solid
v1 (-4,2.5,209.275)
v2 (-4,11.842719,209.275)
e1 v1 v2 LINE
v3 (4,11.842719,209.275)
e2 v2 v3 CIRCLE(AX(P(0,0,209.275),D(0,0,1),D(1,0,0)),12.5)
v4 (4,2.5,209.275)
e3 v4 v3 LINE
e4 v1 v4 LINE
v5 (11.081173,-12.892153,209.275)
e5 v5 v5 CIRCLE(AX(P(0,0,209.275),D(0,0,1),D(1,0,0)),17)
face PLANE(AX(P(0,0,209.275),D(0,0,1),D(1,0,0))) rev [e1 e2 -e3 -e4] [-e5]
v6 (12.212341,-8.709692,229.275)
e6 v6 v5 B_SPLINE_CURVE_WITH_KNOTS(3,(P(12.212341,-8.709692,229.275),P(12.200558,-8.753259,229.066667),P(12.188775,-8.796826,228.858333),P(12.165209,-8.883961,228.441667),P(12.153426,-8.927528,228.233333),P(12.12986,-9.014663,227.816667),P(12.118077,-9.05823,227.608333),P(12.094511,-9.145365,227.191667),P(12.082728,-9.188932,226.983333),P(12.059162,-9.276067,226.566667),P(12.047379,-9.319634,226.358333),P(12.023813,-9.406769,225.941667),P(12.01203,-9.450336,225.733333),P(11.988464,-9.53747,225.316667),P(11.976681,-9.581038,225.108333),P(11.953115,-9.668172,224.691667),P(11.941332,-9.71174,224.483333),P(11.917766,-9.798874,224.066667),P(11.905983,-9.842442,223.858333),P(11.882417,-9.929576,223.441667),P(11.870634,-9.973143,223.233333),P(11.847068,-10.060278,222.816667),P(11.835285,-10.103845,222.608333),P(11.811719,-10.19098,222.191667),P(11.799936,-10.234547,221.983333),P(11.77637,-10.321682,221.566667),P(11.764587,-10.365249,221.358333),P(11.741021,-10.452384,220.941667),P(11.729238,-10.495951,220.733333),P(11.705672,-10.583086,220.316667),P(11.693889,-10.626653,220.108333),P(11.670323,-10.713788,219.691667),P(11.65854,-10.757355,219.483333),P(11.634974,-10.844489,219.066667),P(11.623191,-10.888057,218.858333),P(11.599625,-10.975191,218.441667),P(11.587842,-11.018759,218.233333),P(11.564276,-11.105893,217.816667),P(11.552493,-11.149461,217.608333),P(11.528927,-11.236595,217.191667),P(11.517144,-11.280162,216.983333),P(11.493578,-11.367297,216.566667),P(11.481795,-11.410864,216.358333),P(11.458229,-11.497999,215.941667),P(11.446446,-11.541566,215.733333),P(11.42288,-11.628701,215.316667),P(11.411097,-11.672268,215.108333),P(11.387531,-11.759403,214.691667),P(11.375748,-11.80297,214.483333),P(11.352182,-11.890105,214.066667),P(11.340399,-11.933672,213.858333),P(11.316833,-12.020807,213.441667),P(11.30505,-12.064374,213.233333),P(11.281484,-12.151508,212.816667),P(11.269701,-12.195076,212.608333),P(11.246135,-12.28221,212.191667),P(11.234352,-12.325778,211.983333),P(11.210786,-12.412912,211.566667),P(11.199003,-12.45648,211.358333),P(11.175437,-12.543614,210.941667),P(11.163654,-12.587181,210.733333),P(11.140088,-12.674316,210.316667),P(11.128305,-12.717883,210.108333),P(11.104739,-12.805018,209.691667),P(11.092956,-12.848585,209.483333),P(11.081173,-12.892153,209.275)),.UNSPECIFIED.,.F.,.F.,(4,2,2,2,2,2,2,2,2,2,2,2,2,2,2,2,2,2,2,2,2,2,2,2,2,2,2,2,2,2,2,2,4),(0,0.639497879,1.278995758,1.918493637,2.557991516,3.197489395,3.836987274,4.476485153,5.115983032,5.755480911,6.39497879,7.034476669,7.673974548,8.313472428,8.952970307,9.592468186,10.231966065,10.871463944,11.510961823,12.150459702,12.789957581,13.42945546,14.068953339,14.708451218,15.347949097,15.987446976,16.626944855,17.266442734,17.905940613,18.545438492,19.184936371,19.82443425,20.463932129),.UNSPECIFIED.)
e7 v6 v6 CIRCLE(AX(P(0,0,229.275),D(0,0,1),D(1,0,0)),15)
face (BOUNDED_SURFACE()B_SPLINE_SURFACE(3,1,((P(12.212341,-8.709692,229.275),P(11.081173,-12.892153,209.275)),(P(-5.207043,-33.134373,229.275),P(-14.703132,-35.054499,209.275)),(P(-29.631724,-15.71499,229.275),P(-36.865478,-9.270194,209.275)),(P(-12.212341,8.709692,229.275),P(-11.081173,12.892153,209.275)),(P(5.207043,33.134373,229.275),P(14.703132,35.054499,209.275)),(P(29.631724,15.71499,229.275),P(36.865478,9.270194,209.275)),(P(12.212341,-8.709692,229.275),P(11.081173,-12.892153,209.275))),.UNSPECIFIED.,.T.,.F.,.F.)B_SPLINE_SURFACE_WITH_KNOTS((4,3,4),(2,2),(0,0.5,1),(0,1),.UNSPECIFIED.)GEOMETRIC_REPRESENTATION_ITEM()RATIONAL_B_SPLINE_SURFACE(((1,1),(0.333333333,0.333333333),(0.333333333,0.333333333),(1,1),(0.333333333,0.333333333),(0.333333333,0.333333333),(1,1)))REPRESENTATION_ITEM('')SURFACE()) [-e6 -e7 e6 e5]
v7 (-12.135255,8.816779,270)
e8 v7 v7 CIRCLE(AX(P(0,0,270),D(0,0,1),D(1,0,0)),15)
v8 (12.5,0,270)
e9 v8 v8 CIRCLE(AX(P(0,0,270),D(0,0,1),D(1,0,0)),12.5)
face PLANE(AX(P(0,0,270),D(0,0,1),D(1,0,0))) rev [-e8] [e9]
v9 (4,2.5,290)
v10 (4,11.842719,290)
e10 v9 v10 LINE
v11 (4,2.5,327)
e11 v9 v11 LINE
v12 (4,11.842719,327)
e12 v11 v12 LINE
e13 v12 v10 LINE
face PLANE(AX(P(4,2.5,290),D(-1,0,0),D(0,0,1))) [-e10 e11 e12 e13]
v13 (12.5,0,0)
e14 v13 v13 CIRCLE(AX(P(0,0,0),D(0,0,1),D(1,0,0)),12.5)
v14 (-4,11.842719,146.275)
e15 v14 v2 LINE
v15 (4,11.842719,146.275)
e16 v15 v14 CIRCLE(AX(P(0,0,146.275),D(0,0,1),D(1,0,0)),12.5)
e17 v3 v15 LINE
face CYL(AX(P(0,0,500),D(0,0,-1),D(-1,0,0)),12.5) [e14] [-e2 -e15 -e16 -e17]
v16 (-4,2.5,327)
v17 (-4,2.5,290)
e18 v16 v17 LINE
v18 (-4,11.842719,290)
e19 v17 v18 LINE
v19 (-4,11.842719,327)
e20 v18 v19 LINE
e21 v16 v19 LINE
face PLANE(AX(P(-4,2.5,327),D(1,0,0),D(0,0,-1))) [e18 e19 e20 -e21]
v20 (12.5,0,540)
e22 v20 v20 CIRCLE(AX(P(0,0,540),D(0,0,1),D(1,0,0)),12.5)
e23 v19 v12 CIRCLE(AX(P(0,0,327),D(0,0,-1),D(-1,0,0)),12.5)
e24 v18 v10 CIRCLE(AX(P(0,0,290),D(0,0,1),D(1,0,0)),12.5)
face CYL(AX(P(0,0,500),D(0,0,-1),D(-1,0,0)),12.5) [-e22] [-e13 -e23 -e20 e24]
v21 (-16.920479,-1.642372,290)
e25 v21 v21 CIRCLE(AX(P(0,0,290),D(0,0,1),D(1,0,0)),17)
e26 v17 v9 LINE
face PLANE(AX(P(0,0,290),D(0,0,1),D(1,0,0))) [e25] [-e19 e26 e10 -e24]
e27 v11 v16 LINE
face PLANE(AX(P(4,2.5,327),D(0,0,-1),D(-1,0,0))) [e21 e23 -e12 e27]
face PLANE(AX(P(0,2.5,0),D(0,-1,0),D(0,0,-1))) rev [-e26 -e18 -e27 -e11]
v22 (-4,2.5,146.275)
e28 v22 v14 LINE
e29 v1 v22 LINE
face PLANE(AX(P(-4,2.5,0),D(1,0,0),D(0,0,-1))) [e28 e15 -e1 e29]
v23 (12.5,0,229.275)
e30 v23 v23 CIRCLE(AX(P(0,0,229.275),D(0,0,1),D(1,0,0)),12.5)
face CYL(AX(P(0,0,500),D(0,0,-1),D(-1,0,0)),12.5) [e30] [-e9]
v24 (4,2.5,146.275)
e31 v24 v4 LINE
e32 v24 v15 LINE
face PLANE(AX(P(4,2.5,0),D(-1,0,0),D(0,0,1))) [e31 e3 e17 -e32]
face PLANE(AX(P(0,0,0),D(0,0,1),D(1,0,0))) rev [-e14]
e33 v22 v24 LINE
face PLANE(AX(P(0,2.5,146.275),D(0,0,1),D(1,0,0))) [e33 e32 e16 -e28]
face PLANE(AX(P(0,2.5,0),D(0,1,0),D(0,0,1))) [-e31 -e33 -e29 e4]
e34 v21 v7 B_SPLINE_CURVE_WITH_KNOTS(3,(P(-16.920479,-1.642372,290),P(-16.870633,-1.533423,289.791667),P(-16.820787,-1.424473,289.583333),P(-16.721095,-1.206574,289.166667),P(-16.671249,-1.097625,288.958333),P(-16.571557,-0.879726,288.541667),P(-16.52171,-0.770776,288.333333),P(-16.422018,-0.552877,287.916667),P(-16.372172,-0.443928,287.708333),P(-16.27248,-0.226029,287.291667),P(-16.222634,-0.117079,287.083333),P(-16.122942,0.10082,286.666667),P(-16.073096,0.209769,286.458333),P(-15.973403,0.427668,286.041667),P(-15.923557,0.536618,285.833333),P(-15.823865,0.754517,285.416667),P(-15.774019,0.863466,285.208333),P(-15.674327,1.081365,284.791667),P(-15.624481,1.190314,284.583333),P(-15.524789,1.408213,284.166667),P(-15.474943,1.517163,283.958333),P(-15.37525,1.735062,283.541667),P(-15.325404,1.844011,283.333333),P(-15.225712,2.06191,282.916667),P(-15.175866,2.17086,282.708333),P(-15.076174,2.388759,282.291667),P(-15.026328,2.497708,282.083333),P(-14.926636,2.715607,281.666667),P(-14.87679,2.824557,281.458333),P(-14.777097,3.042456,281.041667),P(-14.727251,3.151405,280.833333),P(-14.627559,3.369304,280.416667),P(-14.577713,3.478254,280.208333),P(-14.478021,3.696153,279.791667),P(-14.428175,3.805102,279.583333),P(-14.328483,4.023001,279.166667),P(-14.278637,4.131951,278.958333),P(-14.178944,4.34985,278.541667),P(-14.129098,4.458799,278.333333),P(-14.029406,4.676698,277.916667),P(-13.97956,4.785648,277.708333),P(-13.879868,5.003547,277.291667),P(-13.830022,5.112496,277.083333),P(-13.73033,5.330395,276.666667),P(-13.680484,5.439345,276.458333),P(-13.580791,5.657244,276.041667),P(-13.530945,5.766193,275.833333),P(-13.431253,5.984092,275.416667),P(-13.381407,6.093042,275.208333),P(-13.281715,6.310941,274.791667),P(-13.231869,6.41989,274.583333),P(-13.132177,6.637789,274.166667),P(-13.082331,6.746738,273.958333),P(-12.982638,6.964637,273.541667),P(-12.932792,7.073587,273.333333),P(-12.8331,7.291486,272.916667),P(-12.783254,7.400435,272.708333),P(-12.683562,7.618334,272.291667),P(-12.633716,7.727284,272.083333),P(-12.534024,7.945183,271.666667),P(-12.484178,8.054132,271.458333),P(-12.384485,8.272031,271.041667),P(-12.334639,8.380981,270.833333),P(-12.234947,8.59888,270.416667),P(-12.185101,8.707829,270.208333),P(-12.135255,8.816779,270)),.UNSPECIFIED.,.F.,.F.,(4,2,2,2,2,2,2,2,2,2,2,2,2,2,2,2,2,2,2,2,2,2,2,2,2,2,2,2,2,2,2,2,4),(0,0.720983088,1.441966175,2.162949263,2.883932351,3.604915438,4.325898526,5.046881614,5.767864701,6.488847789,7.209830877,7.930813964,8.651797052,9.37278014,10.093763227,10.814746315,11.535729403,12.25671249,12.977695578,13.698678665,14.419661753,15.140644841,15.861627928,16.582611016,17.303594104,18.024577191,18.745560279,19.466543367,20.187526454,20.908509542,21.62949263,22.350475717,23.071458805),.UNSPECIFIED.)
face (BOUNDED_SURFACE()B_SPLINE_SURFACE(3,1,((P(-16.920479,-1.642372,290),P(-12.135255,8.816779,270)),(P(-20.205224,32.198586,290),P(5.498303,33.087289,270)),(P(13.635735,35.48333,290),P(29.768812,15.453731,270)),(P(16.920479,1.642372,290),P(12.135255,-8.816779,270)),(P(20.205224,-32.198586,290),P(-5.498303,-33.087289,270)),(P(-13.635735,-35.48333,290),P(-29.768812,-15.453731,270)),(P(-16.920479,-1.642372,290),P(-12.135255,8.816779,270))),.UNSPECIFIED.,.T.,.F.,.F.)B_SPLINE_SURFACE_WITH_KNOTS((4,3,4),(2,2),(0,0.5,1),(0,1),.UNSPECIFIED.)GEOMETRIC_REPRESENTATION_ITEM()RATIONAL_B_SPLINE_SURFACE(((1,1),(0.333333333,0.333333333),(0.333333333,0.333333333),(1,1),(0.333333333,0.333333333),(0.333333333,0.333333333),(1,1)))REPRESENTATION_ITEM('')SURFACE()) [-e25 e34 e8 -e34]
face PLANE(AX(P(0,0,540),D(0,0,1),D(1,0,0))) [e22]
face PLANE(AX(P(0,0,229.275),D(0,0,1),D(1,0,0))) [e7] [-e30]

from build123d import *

# Parameters (mm, degrees)
SKETCH1_R           = 12.5
BOSS_EXTRUDE1_DEPTH = 500
SKETCH6_R           = 12.5
BOSS_EXTRUDE2_DEPTH = 40
CUT_EXTRUDE1_DEPTH  = 10
SKETCH8_W           = 8
SKETCH8_H           = 37
CUT_EXTRUDE2_DEPTH  = 10


with BuildPart() as part:
    # Sketch1 → Boss-Extrude1 (new body)
    with BuildSketch(Plane.XY):
        Circle(SKETCH1_R)
    extrude(amount=BOSS_EXTRUDE1_DEPTH)

    # Loft1: read off the stored shape, not the designer's step
    # Loft1: loft between two sections, ruled curve by curve
    loft1_from = [
        Edge.make_bspline([(12.212340856, -8.709691775, 229.275), (-5.207042693, -33.134373487, 229.275), (-29.631724406, -15.714989938, 229.275), (-12.212340856, 8.709691775, 229.275), (5.207042693, 33.134373487, 229.275), (29.631724406, 15.714989938, 229.275), (12.212340856, -8.709691775, 229.275)], [0, 0, 0, 0, 0.5, 0.5, 0.5, 1, 1, 1, 1], 3, [1, 0.333333333, 0.333333333, 1, 0.333333333, 0.333333333, 1]),
    ]
    loft1_to = [
        Edge.make_bspline([(11.08117333, -12.89215256, 209.275), (-14.70313179, -35.05449922, 209.275), (-36.86547845, -9.2701941, 209.275), (-11.08117333, 12.89215256, 209.275), (14.70313179, 35.05449922, 209.275), (36.86547845, 9.2701941, 209.275), (11.08117333, -12.89215256, 209.275)], [0, 0, 0, 0, 0.5, 0.5, 0.5, 1, 1, 1, 1], 3, [1, 0.333333333, 0.333333333, 1, 0.333333333, 0.333333333, 1]),
    ]
    loft1 = Solid(Shell([*[Face.make_surface_from_curves(loft1_from[k], loft1_to[k]) for k in range(1)], Face(Wire(loft1_from)), Face(Wire(loft1_to))]))
    add(loft1)

    # Loft2: read off the stored shape, not the designer's step
    # Loft2: loft between two sections, ruled curve by curve
    loft2_from = [
        Edge.make_bspline([(-16.92047911, -1.642372271, 290), (-20.205223652, 32.19858595, 290), (13.635734568, 35.483330492, 290), (16.92047911, 1.642372271, 290), (20.205223652, -32.19858595, 290), (-13.635734568, -35.483330492, 290), (-16.92047911, -1.642372271, 290)], [0, 0, 0, 0, 0.5, 0.5, 0.5, 1, 1, 1, 1], 3, [1, 0.333333333, 0.333333333, 1, 0.333333333, 0.333333333, 1]),
    ]
    loft2_to = [
        Edge.make_bspline([(-12.135254916, 8.816778784, 270), (5.498302653, 33.087288616, 270), (29.768812484, 15.453731047, 270), (12.135254916, -8.816778784, 270), (-5.498302653, -33.087288616, 270), (-29.768812484, -15.453731047, 270), (-12.135254916, 8.816778784, 270)], [0, 0, 0, 0, 0.5, 0.5, 0.5, 1, 1, 1, 1], 3, [1, 0.333333333, 0.333333333, 1, 0.333333333, 0.333333333, 1]),
    ]
    loft2 = Solid(Shell([*[Face.make_surface_from_curves(loft2_from[k], loft2_to[k]) for k in range(1)], Face(Wire(loft2_from)), Face(Wire(loft2_to))]))
    add(loft2)

    # Sketch6 → Boss-Extrude2 (add)
    with BuildSketch(Plane.XY.offset(500)):
        Circle(SKETCH6_R)
    extrude(amount=BOSS_EXTRUDE2_DEPTH)

    # Sketch9 → Cut-Extrude1 (cut)
    with BuildSketch(Plane(origin=(0, 12.5, 0), x_dir=(1, 0, 0), z_dir=(0, 1, 0))):
        Polygon((-4, -146.275), (-4, -209.275), (0, -209.275), (4, -209.275), (4, -146.275), align=None)
    extrude(amount=-CUT_EXTRUDE1_DEPTH, mode=Mode.SUBTRACT)

    # Sketch8 → Cut-Extrude2 (cut)
    with BuildSketch(Plane(origin=(0, 12.5, 0), x_dir=(1, 0, 0), z_dir=(0, 1, 0))):
        with Locations((0, -308.5)):
            Rectangle(SKETCH8_W, SKETCH8_H)
    extrude(amount=-CUT_EXTRUDE2_DEPTH, mode=Mode.SUBTRACT)


solid = part.part
